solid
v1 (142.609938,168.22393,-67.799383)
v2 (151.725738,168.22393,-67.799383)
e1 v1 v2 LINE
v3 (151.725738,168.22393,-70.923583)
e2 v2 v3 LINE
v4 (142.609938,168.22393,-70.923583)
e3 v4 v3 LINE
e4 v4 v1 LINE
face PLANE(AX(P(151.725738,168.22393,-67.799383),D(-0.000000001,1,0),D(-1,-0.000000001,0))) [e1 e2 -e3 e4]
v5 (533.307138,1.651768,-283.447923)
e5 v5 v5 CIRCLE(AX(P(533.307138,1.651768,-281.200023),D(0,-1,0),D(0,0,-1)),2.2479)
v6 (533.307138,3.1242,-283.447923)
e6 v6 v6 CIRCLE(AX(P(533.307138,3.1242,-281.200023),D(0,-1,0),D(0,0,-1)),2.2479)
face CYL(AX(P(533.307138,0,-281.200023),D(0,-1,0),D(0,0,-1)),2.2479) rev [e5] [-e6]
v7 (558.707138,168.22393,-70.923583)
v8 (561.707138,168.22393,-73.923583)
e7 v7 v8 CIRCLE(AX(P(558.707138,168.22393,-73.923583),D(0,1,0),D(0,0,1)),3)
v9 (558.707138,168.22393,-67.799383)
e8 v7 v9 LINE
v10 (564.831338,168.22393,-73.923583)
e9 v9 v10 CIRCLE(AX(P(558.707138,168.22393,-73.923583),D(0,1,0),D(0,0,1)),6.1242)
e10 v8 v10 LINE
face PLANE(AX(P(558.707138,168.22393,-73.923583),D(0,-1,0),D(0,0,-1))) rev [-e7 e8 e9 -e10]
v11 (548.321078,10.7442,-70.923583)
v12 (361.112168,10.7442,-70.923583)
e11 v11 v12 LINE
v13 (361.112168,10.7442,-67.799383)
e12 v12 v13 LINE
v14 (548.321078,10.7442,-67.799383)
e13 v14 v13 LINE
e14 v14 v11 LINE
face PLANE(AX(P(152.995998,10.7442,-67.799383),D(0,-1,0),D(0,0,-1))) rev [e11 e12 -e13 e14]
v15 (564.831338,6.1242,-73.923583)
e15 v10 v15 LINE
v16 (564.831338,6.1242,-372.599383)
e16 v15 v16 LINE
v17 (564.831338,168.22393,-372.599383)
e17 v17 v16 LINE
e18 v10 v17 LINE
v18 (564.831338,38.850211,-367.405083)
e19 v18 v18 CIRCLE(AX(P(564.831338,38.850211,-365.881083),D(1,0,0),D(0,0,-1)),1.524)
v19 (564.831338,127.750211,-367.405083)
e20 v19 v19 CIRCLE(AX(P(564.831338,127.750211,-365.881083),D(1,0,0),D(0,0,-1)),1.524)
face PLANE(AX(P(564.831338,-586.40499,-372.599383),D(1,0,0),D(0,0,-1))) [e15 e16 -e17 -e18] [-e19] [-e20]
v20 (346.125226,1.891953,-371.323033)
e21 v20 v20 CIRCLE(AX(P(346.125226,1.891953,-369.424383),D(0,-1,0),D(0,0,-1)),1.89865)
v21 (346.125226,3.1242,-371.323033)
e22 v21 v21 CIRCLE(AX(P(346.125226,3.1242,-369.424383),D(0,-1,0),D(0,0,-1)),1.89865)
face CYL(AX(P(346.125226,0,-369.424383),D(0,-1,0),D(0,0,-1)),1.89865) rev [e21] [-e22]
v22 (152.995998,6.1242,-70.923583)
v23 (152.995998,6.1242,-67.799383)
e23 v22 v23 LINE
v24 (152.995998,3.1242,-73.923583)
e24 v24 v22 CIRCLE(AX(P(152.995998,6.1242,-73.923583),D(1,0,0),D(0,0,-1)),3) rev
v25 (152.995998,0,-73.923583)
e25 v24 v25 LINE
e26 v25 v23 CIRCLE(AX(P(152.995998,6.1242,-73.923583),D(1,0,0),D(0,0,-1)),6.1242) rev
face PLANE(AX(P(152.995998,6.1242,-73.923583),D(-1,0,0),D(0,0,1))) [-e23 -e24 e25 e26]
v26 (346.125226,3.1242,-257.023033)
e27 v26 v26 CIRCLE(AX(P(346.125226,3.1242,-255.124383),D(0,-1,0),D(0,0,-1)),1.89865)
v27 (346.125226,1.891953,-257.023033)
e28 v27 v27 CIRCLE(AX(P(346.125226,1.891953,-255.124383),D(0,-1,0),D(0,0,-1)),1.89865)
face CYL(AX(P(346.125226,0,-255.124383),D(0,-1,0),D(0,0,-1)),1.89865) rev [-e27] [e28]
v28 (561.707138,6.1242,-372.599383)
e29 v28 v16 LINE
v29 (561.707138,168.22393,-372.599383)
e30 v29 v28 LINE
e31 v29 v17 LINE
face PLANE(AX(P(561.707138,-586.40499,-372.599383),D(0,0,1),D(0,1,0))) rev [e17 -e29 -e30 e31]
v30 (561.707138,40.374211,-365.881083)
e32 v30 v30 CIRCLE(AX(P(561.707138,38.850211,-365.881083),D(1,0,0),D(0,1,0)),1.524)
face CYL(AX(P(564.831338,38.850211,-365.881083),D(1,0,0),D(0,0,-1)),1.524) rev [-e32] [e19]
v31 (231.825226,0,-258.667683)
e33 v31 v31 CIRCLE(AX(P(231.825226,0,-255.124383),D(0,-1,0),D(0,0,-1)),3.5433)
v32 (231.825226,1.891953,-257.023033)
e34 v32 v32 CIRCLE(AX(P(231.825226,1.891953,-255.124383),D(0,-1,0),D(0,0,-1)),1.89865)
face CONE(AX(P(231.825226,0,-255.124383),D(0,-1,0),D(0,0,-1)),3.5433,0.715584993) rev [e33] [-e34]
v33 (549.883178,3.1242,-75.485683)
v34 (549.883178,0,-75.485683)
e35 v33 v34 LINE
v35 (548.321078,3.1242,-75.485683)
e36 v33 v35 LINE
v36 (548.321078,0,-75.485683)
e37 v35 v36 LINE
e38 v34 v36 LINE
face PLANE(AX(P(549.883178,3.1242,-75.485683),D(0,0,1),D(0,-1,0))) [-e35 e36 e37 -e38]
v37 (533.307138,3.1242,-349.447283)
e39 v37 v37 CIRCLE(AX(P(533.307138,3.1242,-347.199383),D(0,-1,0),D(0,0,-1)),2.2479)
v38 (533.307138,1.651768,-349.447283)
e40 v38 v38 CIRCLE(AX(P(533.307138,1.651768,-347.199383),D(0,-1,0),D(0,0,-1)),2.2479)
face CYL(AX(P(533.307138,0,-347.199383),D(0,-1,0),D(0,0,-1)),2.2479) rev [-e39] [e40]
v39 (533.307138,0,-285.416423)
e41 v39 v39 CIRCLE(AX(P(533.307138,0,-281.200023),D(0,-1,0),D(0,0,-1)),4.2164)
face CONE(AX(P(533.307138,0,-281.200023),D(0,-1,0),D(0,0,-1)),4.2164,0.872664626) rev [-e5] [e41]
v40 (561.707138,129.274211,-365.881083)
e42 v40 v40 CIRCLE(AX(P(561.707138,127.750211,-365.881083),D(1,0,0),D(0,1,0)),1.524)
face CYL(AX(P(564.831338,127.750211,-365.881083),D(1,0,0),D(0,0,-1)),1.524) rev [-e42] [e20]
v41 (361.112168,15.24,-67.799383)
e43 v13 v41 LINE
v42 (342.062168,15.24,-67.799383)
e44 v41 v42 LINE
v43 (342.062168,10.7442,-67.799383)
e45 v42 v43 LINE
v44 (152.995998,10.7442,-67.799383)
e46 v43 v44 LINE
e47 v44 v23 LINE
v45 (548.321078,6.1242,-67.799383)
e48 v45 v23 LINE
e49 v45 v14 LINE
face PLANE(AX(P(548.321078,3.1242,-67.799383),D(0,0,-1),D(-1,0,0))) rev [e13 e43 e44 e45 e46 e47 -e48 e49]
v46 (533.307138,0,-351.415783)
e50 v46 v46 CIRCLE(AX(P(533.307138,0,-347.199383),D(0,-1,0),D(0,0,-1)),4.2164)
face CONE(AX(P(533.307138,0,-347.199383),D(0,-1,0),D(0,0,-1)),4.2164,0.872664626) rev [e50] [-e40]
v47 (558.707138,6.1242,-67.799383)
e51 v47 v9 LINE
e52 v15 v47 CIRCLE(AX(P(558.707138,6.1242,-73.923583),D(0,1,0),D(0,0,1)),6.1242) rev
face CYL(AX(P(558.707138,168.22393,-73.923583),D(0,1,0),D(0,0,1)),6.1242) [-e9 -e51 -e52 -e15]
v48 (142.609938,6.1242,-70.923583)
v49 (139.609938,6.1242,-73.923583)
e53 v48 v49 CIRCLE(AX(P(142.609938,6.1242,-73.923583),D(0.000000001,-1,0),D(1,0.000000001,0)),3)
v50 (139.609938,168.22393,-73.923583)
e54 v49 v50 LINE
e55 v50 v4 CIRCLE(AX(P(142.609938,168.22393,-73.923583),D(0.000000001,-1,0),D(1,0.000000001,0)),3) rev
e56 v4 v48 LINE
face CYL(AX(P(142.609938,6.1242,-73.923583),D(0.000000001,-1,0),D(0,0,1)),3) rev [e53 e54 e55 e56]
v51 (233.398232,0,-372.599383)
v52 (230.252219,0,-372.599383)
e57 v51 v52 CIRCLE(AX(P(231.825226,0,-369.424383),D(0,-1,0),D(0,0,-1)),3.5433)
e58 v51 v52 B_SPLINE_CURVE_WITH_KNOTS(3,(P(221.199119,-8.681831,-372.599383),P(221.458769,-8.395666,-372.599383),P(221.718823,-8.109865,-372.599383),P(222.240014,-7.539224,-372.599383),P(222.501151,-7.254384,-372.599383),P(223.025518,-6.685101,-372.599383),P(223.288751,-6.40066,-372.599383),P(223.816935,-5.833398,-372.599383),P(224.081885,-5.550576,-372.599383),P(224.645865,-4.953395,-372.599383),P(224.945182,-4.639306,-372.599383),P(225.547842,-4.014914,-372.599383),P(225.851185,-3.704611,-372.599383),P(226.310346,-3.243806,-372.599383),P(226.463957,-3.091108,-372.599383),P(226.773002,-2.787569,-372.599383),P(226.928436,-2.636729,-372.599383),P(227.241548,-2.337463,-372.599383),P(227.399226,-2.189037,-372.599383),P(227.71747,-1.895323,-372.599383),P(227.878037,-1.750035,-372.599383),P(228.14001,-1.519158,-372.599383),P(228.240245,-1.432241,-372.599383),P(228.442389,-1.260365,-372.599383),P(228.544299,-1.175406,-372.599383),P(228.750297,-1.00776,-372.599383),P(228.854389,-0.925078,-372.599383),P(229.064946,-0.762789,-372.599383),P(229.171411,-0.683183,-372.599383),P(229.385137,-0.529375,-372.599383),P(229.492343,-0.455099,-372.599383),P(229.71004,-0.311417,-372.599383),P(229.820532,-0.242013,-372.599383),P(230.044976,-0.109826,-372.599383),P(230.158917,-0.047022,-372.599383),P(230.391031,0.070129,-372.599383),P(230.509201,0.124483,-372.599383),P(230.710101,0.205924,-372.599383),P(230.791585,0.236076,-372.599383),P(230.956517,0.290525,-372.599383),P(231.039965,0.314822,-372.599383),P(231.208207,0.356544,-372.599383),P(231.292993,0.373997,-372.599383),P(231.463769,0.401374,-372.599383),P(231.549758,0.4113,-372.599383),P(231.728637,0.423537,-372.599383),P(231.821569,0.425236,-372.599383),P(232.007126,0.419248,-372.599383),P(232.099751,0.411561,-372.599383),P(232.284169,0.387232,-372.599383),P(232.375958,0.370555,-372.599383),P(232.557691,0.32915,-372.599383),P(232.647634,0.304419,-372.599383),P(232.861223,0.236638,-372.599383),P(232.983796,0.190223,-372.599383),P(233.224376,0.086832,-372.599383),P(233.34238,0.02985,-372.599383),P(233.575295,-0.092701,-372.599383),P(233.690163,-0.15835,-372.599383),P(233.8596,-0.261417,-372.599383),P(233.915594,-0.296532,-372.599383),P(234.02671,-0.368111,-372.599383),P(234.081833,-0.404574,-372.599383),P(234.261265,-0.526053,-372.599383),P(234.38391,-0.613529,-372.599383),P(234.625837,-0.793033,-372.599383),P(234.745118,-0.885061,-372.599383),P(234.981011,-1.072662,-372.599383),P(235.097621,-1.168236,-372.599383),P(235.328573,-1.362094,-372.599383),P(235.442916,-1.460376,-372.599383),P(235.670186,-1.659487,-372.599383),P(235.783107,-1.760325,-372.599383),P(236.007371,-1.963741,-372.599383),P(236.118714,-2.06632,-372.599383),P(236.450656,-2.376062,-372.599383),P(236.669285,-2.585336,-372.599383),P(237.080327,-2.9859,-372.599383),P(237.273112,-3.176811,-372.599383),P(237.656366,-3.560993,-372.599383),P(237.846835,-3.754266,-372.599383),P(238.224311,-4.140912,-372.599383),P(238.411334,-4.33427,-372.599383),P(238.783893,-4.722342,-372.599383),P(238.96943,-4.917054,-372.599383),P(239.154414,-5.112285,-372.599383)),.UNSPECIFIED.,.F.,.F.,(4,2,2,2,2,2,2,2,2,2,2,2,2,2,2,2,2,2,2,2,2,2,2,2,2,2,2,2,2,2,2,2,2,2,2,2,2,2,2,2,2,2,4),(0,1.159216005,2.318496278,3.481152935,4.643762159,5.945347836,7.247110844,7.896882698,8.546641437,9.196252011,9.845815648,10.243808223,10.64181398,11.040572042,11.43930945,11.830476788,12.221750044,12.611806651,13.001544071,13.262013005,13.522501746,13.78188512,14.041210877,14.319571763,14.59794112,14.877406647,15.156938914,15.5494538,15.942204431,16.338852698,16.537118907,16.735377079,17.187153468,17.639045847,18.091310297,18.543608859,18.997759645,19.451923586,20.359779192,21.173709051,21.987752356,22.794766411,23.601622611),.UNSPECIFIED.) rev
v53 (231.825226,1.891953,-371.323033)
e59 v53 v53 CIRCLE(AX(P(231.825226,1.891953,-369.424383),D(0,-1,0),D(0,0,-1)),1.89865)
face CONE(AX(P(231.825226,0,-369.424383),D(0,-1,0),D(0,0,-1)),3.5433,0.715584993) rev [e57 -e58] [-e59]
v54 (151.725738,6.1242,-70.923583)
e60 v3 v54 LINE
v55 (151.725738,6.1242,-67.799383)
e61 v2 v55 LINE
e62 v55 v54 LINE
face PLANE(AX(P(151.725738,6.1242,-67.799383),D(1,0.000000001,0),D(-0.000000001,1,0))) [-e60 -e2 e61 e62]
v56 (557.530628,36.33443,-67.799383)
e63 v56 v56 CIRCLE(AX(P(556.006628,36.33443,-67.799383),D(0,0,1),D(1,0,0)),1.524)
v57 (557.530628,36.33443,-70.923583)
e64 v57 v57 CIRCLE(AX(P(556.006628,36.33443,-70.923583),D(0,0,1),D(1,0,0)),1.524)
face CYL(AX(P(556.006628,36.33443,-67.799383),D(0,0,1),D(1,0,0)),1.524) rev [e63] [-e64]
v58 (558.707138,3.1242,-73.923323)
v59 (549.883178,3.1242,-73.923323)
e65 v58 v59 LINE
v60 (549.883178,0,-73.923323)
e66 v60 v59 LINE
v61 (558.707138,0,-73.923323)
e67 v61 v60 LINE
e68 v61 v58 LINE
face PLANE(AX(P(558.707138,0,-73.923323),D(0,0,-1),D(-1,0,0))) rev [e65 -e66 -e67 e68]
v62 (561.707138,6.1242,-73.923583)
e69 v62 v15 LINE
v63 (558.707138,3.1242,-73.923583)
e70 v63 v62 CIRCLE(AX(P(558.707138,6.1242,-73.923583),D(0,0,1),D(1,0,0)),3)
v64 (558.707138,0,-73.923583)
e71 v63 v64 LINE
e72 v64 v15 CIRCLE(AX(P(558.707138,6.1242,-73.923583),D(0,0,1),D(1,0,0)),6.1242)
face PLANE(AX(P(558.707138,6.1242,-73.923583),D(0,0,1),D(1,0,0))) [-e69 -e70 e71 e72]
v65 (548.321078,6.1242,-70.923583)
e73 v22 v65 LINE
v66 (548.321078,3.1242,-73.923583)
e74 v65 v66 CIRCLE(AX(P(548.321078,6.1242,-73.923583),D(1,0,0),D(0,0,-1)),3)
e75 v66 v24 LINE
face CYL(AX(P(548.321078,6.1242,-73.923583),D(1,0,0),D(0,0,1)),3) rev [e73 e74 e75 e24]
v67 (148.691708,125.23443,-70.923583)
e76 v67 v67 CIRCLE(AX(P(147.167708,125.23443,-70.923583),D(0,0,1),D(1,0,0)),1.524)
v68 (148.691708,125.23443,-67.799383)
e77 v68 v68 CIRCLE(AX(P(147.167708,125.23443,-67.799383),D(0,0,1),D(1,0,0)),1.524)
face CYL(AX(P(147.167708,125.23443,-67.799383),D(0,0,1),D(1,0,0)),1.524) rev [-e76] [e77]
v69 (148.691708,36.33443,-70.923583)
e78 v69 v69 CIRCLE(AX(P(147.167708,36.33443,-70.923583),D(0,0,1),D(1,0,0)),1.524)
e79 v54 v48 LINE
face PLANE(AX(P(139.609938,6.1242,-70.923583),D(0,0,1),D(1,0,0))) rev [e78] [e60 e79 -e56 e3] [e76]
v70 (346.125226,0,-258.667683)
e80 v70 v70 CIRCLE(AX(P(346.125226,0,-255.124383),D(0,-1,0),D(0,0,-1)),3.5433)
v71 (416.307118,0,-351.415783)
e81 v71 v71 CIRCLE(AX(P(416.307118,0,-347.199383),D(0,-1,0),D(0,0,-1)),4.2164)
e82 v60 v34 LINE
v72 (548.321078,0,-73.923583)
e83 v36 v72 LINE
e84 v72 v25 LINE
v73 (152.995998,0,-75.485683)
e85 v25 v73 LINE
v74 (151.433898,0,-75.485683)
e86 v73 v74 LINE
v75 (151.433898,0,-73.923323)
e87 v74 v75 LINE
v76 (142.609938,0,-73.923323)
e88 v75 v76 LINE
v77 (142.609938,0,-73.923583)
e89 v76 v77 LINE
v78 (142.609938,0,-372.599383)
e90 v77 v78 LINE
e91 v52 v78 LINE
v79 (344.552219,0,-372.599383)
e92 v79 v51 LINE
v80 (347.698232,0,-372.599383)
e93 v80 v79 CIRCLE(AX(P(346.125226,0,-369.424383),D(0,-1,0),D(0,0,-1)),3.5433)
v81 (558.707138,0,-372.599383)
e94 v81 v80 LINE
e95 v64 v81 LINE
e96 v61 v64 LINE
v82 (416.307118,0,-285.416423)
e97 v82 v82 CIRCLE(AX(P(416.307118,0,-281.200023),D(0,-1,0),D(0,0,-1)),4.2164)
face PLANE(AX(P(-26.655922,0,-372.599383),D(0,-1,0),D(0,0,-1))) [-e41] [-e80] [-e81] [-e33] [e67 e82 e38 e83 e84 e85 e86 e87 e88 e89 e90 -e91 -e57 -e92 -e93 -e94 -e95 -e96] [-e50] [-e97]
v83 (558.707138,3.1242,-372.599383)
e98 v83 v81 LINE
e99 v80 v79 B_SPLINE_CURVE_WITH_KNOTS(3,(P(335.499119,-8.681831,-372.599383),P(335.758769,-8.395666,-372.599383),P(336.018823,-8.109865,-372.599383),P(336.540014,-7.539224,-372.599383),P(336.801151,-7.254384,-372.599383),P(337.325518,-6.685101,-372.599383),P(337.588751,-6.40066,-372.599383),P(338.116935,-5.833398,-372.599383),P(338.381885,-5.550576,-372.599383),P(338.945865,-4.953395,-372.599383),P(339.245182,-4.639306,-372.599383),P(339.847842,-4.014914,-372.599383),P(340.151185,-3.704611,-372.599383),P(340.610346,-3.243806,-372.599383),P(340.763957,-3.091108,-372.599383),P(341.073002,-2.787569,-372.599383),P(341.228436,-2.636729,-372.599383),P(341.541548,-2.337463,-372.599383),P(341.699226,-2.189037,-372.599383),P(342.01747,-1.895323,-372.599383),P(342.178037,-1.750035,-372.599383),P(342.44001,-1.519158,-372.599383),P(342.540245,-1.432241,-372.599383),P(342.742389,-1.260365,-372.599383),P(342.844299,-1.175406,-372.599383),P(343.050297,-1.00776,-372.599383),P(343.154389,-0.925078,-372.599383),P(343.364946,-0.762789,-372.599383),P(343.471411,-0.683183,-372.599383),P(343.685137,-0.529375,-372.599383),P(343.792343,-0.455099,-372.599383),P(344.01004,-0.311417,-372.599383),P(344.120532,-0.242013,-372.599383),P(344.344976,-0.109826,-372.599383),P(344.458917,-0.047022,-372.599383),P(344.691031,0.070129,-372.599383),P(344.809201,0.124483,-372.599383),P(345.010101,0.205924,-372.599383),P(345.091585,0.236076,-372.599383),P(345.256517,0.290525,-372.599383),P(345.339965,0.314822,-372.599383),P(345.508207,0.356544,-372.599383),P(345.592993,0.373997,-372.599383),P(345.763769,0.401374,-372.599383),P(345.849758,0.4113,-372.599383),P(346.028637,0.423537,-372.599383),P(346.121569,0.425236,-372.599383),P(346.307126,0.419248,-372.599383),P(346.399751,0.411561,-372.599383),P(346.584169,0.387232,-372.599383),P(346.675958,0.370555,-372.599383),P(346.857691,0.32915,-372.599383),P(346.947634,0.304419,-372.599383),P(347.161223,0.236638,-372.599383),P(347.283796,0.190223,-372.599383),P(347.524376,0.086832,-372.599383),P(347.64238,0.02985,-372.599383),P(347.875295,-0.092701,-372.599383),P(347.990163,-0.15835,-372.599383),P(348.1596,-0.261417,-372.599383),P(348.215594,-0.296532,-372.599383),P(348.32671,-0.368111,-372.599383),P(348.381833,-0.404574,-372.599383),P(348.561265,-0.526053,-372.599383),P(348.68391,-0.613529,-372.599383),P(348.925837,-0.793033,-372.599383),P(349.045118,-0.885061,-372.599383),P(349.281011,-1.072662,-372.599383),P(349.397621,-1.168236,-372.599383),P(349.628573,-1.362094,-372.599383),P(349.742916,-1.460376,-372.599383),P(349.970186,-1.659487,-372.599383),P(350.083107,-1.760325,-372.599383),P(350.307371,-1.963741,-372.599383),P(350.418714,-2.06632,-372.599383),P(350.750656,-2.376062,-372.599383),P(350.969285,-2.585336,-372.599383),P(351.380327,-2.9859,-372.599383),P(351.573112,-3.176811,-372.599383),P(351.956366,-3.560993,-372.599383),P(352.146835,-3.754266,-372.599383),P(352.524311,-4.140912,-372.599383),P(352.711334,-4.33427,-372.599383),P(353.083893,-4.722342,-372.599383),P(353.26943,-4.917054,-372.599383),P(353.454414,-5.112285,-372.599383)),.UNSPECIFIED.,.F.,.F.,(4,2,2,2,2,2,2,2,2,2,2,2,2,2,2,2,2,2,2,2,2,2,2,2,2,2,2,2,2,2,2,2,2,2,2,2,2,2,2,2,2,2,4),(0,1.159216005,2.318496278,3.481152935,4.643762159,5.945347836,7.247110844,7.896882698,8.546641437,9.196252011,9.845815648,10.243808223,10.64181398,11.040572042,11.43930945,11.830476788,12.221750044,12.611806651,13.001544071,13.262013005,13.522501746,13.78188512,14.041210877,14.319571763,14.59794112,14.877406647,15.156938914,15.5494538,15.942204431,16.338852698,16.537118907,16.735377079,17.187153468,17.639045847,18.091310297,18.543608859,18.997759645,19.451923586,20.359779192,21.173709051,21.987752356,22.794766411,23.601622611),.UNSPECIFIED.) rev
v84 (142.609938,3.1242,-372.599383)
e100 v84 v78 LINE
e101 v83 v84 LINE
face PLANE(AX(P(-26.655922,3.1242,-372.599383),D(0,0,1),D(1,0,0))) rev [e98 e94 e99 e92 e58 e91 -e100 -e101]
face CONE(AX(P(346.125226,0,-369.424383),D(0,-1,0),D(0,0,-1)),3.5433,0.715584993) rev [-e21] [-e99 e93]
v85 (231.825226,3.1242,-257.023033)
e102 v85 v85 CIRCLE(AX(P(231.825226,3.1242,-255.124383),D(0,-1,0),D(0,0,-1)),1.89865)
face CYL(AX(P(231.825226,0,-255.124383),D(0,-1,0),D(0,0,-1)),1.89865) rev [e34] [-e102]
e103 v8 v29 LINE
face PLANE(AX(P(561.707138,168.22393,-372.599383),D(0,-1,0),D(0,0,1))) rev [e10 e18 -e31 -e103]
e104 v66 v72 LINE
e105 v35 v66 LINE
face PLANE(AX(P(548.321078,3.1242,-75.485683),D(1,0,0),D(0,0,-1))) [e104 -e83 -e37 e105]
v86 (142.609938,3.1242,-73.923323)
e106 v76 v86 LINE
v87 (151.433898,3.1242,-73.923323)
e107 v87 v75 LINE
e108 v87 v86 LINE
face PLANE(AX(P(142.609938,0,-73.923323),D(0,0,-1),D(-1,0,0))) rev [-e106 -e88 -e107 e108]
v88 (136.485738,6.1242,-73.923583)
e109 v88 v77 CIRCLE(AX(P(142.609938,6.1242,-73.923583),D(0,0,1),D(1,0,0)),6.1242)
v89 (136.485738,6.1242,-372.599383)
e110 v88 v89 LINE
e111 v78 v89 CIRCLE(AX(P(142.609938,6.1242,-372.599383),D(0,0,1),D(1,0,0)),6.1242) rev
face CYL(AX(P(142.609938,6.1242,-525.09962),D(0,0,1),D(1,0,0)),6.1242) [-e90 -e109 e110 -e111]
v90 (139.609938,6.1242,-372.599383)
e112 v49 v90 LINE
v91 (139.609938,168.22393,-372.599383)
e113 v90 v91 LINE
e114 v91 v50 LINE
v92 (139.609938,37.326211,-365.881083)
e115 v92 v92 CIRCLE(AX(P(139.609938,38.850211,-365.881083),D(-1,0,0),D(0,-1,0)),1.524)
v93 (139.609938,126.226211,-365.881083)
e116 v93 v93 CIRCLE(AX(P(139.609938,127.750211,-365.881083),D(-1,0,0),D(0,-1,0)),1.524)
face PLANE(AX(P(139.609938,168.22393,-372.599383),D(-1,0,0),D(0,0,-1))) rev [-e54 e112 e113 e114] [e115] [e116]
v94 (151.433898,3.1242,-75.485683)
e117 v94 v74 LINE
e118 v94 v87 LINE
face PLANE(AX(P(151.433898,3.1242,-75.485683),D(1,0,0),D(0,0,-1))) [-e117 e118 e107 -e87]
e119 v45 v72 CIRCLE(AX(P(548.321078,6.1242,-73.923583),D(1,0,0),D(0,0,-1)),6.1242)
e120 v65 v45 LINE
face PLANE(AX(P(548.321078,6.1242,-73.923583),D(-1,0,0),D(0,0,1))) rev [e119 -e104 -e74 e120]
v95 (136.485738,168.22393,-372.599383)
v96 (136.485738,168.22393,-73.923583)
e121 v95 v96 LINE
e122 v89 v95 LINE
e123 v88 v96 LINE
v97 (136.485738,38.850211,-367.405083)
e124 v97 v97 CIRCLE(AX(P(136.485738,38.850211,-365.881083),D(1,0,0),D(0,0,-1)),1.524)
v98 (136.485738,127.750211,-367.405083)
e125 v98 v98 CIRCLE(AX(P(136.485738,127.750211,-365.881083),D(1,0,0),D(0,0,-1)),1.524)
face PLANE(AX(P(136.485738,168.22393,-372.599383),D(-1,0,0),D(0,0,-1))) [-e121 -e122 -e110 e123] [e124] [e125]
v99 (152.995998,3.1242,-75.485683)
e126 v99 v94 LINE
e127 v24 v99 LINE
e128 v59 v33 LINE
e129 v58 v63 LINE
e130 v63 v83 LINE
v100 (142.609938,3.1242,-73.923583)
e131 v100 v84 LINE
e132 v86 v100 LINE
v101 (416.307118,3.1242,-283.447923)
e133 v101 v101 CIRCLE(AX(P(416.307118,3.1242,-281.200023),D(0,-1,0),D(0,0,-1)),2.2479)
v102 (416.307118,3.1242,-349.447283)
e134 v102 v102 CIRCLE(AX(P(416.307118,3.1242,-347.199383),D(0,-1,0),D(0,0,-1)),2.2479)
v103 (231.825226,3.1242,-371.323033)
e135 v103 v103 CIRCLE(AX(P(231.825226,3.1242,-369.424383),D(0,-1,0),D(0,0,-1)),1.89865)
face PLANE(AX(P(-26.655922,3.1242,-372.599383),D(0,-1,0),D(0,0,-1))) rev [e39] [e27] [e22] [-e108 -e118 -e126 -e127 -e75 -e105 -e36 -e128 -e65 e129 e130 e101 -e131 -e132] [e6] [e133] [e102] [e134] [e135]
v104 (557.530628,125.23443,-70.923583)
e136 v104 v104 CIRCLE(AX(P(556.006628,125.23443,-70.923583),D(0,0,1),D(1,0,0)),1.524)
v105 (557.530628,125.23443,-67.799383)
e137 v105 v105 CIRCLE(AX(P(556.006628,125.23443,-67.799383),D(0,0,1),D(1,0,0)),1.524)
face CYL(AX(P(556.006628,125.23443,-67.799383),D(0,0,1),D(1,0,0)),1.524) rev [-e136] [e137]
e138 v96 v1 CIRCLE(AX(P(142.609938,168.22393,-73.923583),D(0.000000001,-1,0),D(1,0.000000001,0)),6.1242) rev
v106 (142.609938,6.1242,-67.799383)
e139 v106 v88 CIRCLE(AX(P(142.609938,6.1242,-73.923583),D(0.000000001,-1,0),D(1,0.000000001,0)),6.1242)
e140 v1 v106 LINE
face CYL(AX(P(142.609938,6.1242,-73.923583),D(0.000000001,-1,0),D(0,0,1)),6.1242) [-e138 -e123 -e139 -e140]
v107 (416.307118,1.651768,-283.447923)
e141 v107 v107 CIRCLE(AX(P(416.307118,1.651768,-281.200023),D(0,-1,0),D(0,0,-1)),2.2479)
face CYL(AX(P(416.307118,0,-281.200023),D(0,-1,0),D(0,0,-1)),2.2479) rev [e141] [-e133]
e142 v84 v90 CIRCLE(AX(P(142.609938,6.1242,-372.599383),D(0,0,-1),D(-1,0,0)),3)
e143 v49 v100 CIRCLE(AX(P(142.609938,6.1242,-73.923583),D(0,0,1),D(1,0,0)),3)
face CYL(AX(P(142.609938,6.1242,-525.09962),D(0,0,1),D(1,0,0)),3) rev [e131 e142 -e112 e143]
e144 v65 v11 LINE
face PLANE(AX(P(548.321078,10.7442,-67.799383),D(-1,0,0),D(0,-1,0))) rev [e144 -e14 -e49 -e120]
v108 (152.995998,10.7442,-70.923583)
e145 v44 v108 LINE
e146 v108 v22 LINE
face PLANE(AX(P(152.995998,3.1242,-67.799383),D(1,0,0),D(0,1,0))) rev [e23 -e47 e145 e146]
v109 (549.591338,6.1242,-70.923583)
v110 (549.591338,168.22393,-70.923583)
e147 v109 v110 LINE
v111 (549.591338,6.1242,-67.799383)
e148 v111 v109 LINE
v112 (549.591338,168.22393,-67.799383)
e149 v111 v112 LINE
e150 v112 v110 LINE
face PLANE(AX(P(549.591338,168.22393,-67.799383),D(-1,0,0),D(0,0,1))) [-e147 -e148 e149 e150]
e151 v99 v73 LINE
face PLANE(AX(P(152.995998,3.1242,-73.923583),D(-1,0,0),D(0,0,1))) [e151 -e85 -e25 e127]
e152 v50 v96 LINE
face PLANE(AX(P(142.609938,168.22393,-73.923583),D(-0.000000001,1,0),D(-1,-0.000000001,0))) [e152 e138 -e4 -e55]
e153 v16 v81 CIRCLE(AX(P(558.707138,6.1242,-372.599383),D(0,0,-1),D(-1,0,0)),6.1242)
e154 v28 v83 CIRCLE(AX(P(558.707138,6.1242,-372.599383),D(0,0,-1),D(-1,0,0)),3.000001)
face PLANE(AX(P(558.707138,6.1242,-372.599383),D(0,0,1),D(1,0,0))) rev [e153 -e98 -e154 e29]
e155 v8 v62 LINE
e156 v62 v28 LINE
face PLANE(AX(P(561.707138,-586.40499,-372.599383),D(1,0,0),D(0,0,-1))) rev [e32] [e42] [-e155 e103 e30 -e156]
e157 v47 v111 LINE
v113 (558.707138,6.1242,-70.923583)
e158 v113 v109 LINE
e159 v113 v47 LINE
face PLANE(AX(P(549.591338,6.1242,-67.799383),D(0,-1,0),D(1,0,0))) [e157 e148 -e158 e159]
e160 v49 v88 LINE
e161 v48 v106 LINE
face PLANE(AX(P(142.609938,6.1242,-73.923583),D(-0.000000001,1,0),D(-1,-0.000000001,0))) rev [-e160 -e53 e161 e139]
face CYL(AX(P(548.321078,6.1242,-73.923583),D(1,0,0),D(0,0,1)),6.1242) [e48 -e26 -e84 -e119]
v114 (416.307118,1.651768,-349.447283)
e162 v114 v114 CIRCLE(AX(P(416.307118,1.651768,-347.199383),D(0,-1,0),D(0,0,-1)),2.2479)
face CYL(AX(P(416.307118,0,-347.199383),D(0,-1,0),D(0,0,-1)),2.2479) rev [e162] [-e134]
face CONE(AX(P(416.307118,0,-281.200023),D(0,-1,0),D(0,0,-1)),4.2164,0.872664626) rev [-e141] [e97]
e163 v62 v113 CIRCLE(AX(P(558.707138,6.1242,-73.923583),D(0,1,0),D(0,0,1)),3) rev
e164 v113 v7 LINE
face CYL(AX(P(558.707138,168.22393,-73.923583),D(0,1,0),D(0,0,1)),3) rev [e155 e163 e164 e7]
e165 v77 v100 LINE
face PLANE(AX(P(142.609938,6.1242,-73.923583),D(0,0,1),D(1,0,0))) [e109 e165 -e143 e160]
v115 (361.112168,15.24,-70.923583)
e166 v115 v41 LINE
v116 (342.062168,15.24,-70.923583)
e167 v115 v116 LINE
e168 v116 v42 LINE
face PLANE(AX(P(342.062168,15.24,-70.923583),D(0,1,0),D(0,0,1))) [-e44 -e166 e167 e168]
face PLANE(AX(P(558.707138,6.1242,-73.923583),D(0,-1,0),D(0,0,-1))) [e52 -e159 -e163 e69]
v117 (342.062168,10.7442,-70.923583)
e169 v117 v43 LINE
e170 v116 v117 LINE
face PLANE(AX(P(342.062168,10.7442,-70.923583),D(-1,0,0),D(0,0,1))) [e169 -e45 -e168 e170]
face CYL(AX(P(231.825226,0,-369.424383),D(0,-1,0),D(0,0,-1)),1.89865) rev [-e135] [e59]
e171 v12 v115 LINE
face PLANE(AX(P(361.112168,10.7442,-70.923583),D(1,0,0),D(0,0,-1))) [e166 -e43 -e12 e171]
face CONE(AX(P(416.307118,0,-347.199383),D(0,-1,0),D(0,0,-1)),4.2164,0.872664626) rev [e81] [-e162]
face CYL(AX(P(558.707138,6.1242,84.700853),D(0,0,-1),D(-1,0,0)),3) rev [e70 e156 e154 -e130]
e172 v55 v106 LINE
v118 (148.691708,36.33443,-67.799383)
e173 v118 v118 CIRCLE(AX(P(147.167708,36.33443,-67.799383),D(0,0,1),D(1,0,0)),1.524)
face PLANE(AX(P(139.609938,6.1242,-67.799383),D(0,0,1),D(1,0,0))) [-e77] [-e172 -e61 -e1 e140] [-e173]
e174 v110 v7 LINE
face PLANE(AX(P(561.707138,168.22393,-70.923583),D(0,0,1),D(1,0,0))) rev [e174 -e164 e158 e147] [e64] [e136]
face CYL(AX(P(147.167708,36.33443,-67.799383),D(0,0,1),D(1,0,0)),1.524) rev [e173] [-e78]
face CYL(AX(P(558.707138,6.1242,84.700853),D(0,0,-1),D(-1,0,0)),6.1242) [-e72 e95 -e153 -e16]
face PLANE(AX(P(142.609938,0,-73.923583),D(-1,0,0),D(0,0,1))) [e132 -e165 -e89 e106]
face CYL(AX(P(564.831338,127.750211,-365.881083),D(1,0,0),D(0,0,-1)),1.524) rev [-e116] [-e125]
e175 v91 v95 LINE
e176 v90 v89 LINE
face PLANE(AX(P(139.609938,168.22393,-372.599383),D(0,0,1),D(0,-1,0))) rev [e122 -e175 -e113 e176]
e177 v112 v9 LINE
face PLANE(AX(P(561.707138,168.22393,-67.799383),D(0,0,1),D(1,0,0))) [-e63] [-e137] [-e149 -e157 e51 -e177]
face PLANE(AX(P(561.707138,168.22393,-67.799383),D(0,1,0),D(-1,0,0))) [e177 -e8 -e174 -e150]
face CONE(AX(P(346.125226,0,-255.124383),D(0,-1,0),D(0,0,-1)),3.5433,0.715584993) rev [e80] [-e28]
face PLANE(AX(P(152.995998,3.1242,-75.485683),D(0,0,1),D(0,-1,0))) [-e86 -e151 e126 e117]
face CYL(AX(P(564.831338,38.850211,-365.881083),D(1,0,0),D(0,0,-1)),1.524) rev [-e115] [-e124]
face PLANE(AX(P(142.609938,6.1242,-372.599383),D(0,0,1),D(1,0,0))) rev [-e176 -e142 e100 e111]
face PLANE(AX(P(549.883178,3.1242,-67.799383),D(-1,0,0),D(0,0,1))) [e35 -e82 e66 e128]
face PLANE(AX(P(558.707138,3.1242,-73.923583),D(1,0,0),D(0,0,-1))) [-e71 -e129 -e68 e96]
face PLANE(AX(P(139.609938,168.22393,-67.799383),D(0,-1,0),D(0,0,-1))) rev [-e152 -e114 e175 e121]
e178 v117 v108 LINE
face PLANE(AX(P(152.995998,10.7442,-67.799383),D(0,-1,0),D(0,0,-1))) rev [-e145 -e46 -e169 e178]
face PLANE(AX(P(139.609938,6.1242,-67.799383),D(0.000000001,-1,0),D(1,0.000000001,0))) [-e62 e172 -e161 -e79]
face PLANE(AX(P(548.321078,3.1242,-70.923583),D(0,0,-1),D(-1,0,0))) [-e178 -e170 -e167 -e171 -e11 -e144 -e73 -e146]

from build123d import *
from OCP.BRepAlgoAPI import BRepAlgoAPI_Cut
from OCP.TopTools import TopTools_ListOfShape

# Parameters (mm, degrees)
BASE_FLANGE1_DEPTH                                = 3.1241999999999996
SKETCHED_START                                    = -372.599383401
SKETCHED_BEND1_DEPTH                              = 304.8
SKETCHED_BEND1_2_DEPTH                            = 304.8
SKETCHED_BEND2_DEPTH                              = 304.8
SKETCHED_BEND2_2_DEPTH                            = 304.8
EDGE_FLANGE1_START                                = -1
EDGE_FLANGE1_DEPTH                                = 169.22392973
EDGE_FLANGE1_2_DEPTH                              = 7.124199914
EDGE_FLANGE1_START_2                              = 6.124199914
EDGE_FLANGE1_3_DEPTH                              = 162.099729816
EDGE_FLANGE2_START                                = -1
EDGE_FLANGE2_DEPTH                                = 169.223930078
EDGE_FLANGE2_2_DEPTH                              = 7.1242
EDGE_FLANGE2_START_2                              = 6.1242
EDGE_FLANGE2_3_DEPTH                              = 162.099730078
CUT_EXTRUDE1_DEPTH                                = 697.5074743358982
CUT_EXTRUDE2_DEPTH                                = 697.5074743358982
EDGE_FLANGE4_START                                = 152.995997641
EDGE_FLANGE4_DEPTH                                = 395.32508
EDGE_FLANGE4_START_2                              = 151.433897641
EDGE_FLANGE4_2_DEPTH                              = 1.5621
EDGE_FLANGE4_START_3                              = 548.321077641
EDGE_FLANGE4_3_DEPTH                              = 1.5621
EDGE_FLANGE4_4_DEPTH                              = 395.32508
SKETCH18_W                                        = 19.05000000000001
SKETCH18_H                                        = 4.495799999999319
TAB1_DEPTH                                        = 3.1241999999999996
CSK_FOR_8_FLAT_HEAD_MACHINE_SCREW_100_D           = 4.4958
CSK_FOR_8_FLAT_HEAD_MACHINE_SCREW_100_CSINK_D     = 8.4328
CSK_FOR_8_FLAT_HEAD_MACHINE_SCREW_100_CSINK_ANGLE = 100
LPATTERN1_COUNT                                   = 2
LPATTERN1_PITCH                                   = 65.99936
LPATTERN1_COUNT_DIR2                              = 2
LPATTERN1_PITCH_DIR2                              = 117.00001999999999
CSK_FOR_6_FLAT_HEAD_MACHINE_SCREW2_D              = 3.7973
CSK_FOR_6_FLAT_HEAD_MACHINE_SCREW2_CSINK_D        = 7.0866
CSK_FOR_6_FLAT_HEAD_MACHINE_SCREW2_CSINK_ANGLE    = 82
LPATTERN3_COUNT                                   = 2
LPATTERN3_PITCH                                   = 114.3
LPATTERN3_COUNT_DIR2                              = 2
LPATTERN3_PITCH_DIR2                              = 114.3
F_40_0_098_DIAMETER_HOLE1_D                       = 3.048
F_40_0_098_DIAMETER_HOLE1_DEPTH                   = 304.8
LPATTERN4_COUNT                                   = 2
LPATTERN4_PITCH                                   = 88.89999999999999
MIRROR2_COPY_1_D                                  = 3.048
MIRROR2_COPY_1_DEPTH                              = 304.8
MIRROR2_COPY_2_D                                  = 3.048
MIRROR2_COPY_2_DEPTH                              = 304.8
MIRROR2_COPY_3_D                                  = 3.048
MIRROR2_COPY_3_DEPTH                              = 304.8
MIRROR2_COPY_4_D                                  = 3.048
MIRROR2_COPY_4_DEPTH                              = 304.8
F_40_0_098_DIAMETER_HOLE2_D                       = 3.048
LPATTERN5_COUNT                                   = 2
LPATTERN5_PITCH                                   = 88.89999999999999


with BuildPart() as part:
    # Base-Flange1: sheet metal written as solids
    # Sketch1 → Base-Flange1 (new body)
    with BuildSketch(Plane(origin=(0, 0, 0), x_dir=(1, 0, 0), z_dir=(0, 1, 0))):
        Polygon((-26.655922359465325, 372.5993834011592), (727.9729976405347, 372.5993834011592), (727.9729976405347, 67.79938340115923), (-26.65592235946532, 67.79938340115915), align=None)
    extrude(amount=BASE_FLANGE1_DEPTH)

    # Sketched Bend1: read off the stored shape, not the designer's step
    # Sketched Bend1 outline → Sketched Bend1 (cut)
    with BuildSketch(Plane.XY.offset(SKETCHED_START)):
        with BuildLine():
            ThreePointArc((142.609937641, 1e-07), (139.516943564, 0.838444419), (137.270853036, 3.1242))
            Line((137.270853036, 3.1242), (-26.655922359, 3.1242))
            Line((-26.655922359, 3.1242), (-26.655922359, 0))
            Line((-26.655922359, 0), (142.609937641, 1e-07))
        make_face()
    extrude(amount=SKETCHED_BEND1_DEPTH, mode=Mode.SUBTRACT)

    # Sketched Bend1 2 outline → Sketched Bend1 2 (add)
    with BuildSketch(Plane.XY.offset(SKETCHED_START)):
        with BuildLine():
            Line((139.60993774, 6.1242), (139.609937641, 168.223930078))
            Line((139.609937641, 168.223930078), (136.485737641, 168.223930078))
            Line((136.485737641, 168.223930078), (136.48573774, 6.1242))
            ThreePointArc((136.48573774, 6.1242), (136.68526694, 4.573683471), (137.270853036, 3.1242))
            Line((137.270853036, 3.1242), (142.609937641, 3.1242001))
            ThreePointArc((142.609937641, 3.1242001), (140.488617368, 4.002879727), (139.60993774, 6.1242))
        make_face()
    extrude(amount=SKETCHED_BEND1_2_DEPTH)

    # Sketched Bend2: read off the stored shape, not the designer's step
    # Sketched Bend2 outline → Sketched Bend2 (cut)
    with BuildSketch(Plane.XY.offset(SKETCHED_START)):
        with BuildLine():
            Line((727.972997641, 3.1242), (564.046222808, 3.1242))
            ThreePointArc((564.046222808, 3.1242), (561.800132084, 0.838444066), (558.707137641, -3.91e-07))
            Line((558.707137641, -3.91e-07), (727.972997641, 0))
            Line((727.972997641, 0), (727.972997641, 3.1242))
        make_face()
    extrude(amount=SKETCHED_BEND2_DEPTH, mode=Mode.SUBTRACT)

    # Sketched Bend2 2 outline → Sketched Bend2 2 (add)
    with BuildSketch(Plane.XY.offset(SKETCHED_START)):
        with BuildLine():
            Line((564.831337641, 168.223930078), (561.707137641, 168.223930078))
            Line((561.707137641, 168.223930078), (561.707138032, 6.1242))
            ThreePointArc((561.707138032, 6.1242), (560.828458261, 4.00287938), (558.707137641, 3.124199609))
            Line((558.707137641, 3.124199609), (564.046222808, 3.1242))
            ThreePointArc((564.046222808, 3.1242), (564.631808851, 4.57368348), (564.831338032, 6.1242))
            Line((564.831338032, 6.1242), (564.831337641, 168.223930078))
        make_face()
    extrude(amount=SKETCHED_BEND2_2_DEPTH)

    # Edge-Flange1: read off the stored shape, not the designer's step
    # Edge-Flange1 outline → Edge-Flange1 (cut)
    with BuildSketch(Plane(origin=(0, 0, 0), x_dir=(1.0, 6.15831459901035e-10, 0), z_dir=(-6.15831459901035e-10, 1.0, 0)).offset(EDGE_FLANGE1_START)):
        with BuildLine():
            Line((142.609937744, 70.923583401), (142.609937641, 73.923583401))
            Line((142.609937641, 73.923583401), (139.609937744, 73.923583401))
            ThreePointArc((139.609937744, 73.923583401), (140.488617401, 71.802263058), (142.609937744, 70.923583401))
        make_face()
        with BuildLine():
            ThreePointArc((142.609937682, 67.799383401), (138.279474373, 69.593120074), (136.485737744, 73.923583401))
            Line((136.485737744, 73.923583401), (136.485737735, 67.799383401))
            Line((136.485737735, 67.799383401), (142.609937682, 67.799383401))
        make_face()
    extrude(amount=EDGE_FLANGE1_DEPTH, mode=Mode.SUBTRACT)

    # Edge-Flange1 2 outline → Edge-Flange1 2 (cut)
    with BuildSketch(Plane(origin=(0, 0, 0), x_dir=(1.0, 6.15831459901035e-10, 0), z_dir=(-6.15831459901035e-10, 1.0, 0)).offset(EDGE_FLANGE1_START)):
        with BuildLine():
            Line((142.609937682, 67.799383401), (142.609937744, 70.923583401))
            ThreePointArc((142.609937744, 70.923583401), (140.488617401, 71.802263058), (139.609937744, 73.923583401))
            Line((139.609937744, 73.923583401), (136.485737744, 73.923583401))
            ThreePointArc((136.485737744, 73.923583401), (138.279474373, 69.593120074), (142.609937682, 67.799383401))
        make_face()
    extrude(amount=EDGE_FLANGE1_2_DEPTH, mode=Mode.SUBTRACT)

    # Edge-Flange1 3 outline → Edge-Flange1 3 (add)
    with BuildSketch(Plane(origin=(0, 0, 0), x_dir=(1.0, 6.15831459901035e-10, 0), z_dir=(-6.15831459901035e-10, 1.0, 0)).offset(EDGE_FLANGE1_START_2)):
        with BuildLine():
            Line((151.725737744, 70.923583401), (142.609937744, 70.923583401))
            ThreePointArc((142.609937744, 70.923583401), (140.488617401, 71.802263058), (139.609937744, 73.923583401))
            Line((139.609937744, 73.923583401), (139.609937735, 68.584498687))
            ThreePointArc((139.609937735, 68.584498687), (141.059421212, 67.998912598), (142.609937744, 67.799383401))
            Line((142.609937744, 67.799383401), (151.725737744, 67.799383401))
            Line((151.725737744, 67.799383401), (151.725737744, 70.923583401))
        make_face()
    extrude(amount=EDGE_FLANGE1_3_DEPTH)


with BuildPart() as edge_flange2_tool:
    # Edge-Flange2: read off the stored shape, not the designer's step
    # Edge-Flange2 outline → Edge-Flange2 (new body)
    with BuildSketch(Plane(origin=(0, 0, 0), x_dir=(1, 0, 0), z_dir=(0, 1, 0)).offset(EDGE_FLANGE2_START)):
        with BuildLine():
            Line((558.707137641, 67.799383401), (564.831337641, 67.799383401))
            Line((564.831337641, 67.799383401), (564.831337641, 73.923583401))
            ThreePointArc((564.831337641, 73.923583401), (563.03760099, 69.593120052), (558.707137641, 67.799383401))
        make_face()
        with BuildLine():
            Line((558.707137641, 73.923583401), (558.707137641, 70.923583401))
            ThreePointArc((558.707137641, 70.923583401), (560.828457984, 71.802263058), (561.707137641, 73.923583401))
            Line((561.707137641, 73.923583401), (558.707137641, 73.923583401))
        make_face()
    extrude(amount=EDGE_FLANGE2_DEPTH)


with BuildPart() as part_1:
    add(part.part)

    # Edge-Flange2: cut by edge_flange2_tool, with a tolerance
    edge_flange2_stock = TopTools_ListOfShape()
    edge_flange2_stock.Append(part_1.part.wrapped)
    edge_flange2_tools = TopTools_ListOfShape()
    edge_flange2_tools.Append(edge_flange2_tool.part.wrapped)
    edge_flange2_cut = BRepAlgoAPI_Cut()
    edge_flange2_cut.SetArguments(edge_flange2_stock)
    edge_flange2_cut.SetTools(edge_flange2_tools)
    edge_flange2_cut.SetFuzzyValue(0.00001)
    edge_flange2_cut.Build()
    add(Compound.cast(edge_flange2_cut.Shape()).solids(), mode=Mode.REPLACE)


with BuildPart() as edge_flange2_2_tool:
    # Edge-Flange2 2 outline → Edge-Flange2 2 (new body)
    with BuildSketch(Plane(origin=(0, 0, 0), x_dir=(1, 0, 0), z_dir=(0, 1, 0)).offset(EDGE_FLANGE2_START)):
        with BuildLine():
            Line((558.707137641, 70.923583401), (558.707137641, 67.799383401))
            ThreePointArc((558.707137641, 67.799383401), (563.03760099, 69.593120052), (564.831337641, 73.923583401))
            Line((564.831337641, 73.923583401), (561.707137641, 73.923583401))
            ThreePointArc((561.707137641, 73.923583401), (560.828457984, 71.802263058), (558.707137641, 70.923583401))
        make_face()
    extrude(amount=EDGE_FLANGE2_2_DEPTH)


with BuildPart() as part_2:
    add(part_1.part)

    # Edge-Flange2 2: cut by edge_flange2_2_tool, with a tolerance
    edge_flange2_2_stock = TopTools_ListOfShape()
    edge_flange2_2_stock.Append(part_2.part.wrapped)
    edge_flange2_2_tools = TopTools_ListOfShape()
    edge_flange2_2_tools.Append(edge_flange2_2_tool.part.wrapped)
    edge_flange2_2_cut = BRepAlgoAPI_Cut()
    edge_flange2_2_cut.SetArguments(edge_flange2_2_stock)
    edge_flange2_2_cut.SetTools(edge_flange2_2_tools)
    edge_flange2_2_cut.SetFuzzyValue(0.00001)
    edge_flange2_2_cut.Build()
    add(Compound.cast(edge_flange2_2_cut.Shape()).solids(), mode=Mode.REPLACE)


with BuildPart() as edge_flange2_3_tool:
    # Edge-Flange2 3 outline → Edge-Flange2 3 (new body)
    with BuildSketch(Plane(origin=(0, 0, 0), x_dir=(1, 0, 0), z_dir=(0, 1, 0)).offset(EDGE_FLANGE2_START_2)):
        with BuildLine():
            Line((549.591337641, 67.799383401), (558.707137641, 67.799383401))
            ThreePointArc((558.707137641, 67.799383401), (560.257654168, 67.998912597), (561.707137641, 68.584498682))
            Line((561.707137641, 68.584498682), (561.707137641, 73.923583401))
            ThreePointArc((561.707137641, 73.923583401), (560.828457984, 71.802263058), (558.707137641, 70.923583401))
            Line((558.707137641, 70.923583401), (549.591337641, 70.923583401))
            Line((549.591337641, 70.923583401), (549.591337641, 67.799383401))
        make_face()
    extrude(amount=EDGE_FLANGE2_3_DEPTH)


with BuildPart() as part_3:
    add(part_2.part)


with BuildPart() as part_4:
    # Edge-Flange2 3: joined with edge_flange2_3_tool
    add(part_3.part.fuse(edge_flange2_3_tool.part, tol=0.00001))

    # Sketch10 → Cut-Extrude1 (cut, through all)
    with BuildSketch(Plane(origin=(0, 3.1241999999999996, 0), x_dir=(-1, 0, 0), z_dir=(0, 1, 0))):
        Polygon((-142.60993764053464, -67.79938340115915), (-152.99599764053465, -67.79938340115915), (-152.99599764053463, -73.92332340115915), (-142.6099376405346, -73.92332340115917), align=None)
    extrude(amount=-CUT_EXTRUDE1_DEPTH, mode=Mode.SUBTRACT)

    # Sketch11 → Cut-Extrude2 (cut, through all)
    with BuildSketch(Plane(origin=(0, 3.1241999999999996, 0), x_dir=(-1, 0, 0), z_dir=(0, 1, 0))):
        Polygon((-558.7071376405341, -67.79938340115922), (-548.3210776405342, -67.7993834011592), (-548.3210776405341, -73.92332340115921), (-558.7071376405341, -73.92332340115921), align=None)
    extrude(amount=-CUT_EXTRUDE2_DEPTH, mode=Mode.SUBTRACT)

    # Edge-Flange4: read off the stored shape, not the designer's step
    # Edge-Flange4 outline → Edge-Flange4 (cut)
    with BuildSketch(Plane.YZ.offset(EDGE_FLANGE4_START)):
        with BuildLine():
            Line((-3.91e-07, -67.799383401), (6e-09, -73.923323401))
            ThreePointArc((6e-09, -73.923323401), (0.838510004, -70.830477048), (3.1242, -68.584498682))
            Line((3.1242, -68.584498682), (3.1242, -67.799383401))
            Line((3.1242, -67.799383401), (-3.91e-07, -67.799383401))
        make_face()
    extrude(amount=EDGE_FLANGE4_DEPTH, mode=Mode.SUBTRACT)

    # Edge-Flange4 2 outline → Edge-Flange4 2 (cut)
    with BuildSketch(Plane.YZ.offset(EDGE_FLANGE4_START_2)):
        Polygon((0, -75.485683401), (3.1242, -75.485683401), (3.1242, -73.923323401), (-3.91e-07, -73.923323401), align=None)
    extrude(amount=EDGE_FLANGE4_2_DEPTH, mode=Mode.SUBTRACT)

    # Edge-Flange4 3 outline → Edge-Flange4 3 (cut)
    with BuildSketch(Plane.YZ.offset(EDGE_FLANGE4_START_3)):
        Polygon((0, -75.485683401), (3.1242, -75.485683401), (3.1242, -73.923323401), (-3.91e-07, -73.923323401), align=None)
    extrude(amount=EDGE_FLANGE4_3_DEPTH, mode=Mode.SUBTRACT)

    # Edge-Flange4 4 outline → Edge-Flange4 4 (add)
    with BuildSketch(Plane.YZ.offset(EDGE_FLANGE4_START)):
        with BuildLine():
            Line((3.1242, -68.584498682), (3.124200011, -73.923323401))
            ThreePointArc((3.124200011, -73.923323401), (4.002971582, -71.802171136), (6.1242, -70.923583401))
            Line((6.1242, -70.923583401), (10.7442, -70.923583401))
            Line((10.7442, -70.923583401), (10.7442, -67.799383401))
            Line((10.7442, -67.799383401), (6.1242, -67.799383401))
            ThreePointArc((6.1242, -67.799383401), (4.573683473, -67.998912597), (3.1242, -68.584498682))
        make_face()
    extrude(amount=EDGE_FLANGE4_4_DEPTH)

    # Tab1: sheet metal written as solids
    # Sketch18 → Tab1 (add)
    with BuildSketch(Plane.XY.offset(-67.79938340115912)):
        with Locations((351.5871676405345, 12.99209999999966)):
            Rectangle(SKETCH18_W, SKETCH18_H)
    extrude(amount=-TAB1_DEPTH)

    # CSK for #8 Flat Head Machine Screw (100)1 (through all)
    with Locations(Plane(origin=(533.307137641, 0, -347.199383401), x_dir=(0, 0, -1), z_dir=(0, -1, 0))):
        with Locations((0, 0)):
            csk_for_8_flat_head_machine_screw_100 = CounterSinkHole(CSK_FOR_8_FLAT_HEAD_MACHINE_SCREW_100_D / 2, CSK_FOR_8_FLAT_HEAD_MACHINE_SCREW_100_CSINK_D / 2, counter_sink_angle=CSK_FOR_8_FLAT_HEAD_MACHINE_SCREW_100_CSINK_ANGLE)

    # LPattern1: CSK for _8 Flat Head Machine Screw _100 2 × 2
    with Locations(*[(-j * LPATTERN1_PITCH_DIR2, 0, i * LPATTERN1_PITCH) for i in range(LPATTERN1_COUNT) for j in range(LPATTERN1_COUNT_DIR2) if (i, j) != (0, 0)]):
        add(csk_for_8_flat_head_machine_screw_100, mode=Mode.SUBTRACT)

    # CSK for #6 Flat Head Machine Screw2 (through all)
    with Locations(Plane(origin=(346.125225558, 0, -369.424383401), x_dir=(0, 0, -1), z_dir=(0, -1, 0))):
        with Locations((0, 0)):
            csk_for_6_flat_head_machine_screw2 = CounterSinkHole(CSK_FOR_6_FLAT_HEAD_MACHINE_SCREW2_D / 2, CSK_FOR_6_FLAT_HEAD_MACHINE_SCREW2_CSINK_D / 2, counter_sink_angle=CSK_FOR_6_FLAT_HEAD_MACHINE_SCREW2_CSINK_ANGLE)

    # LPattern3: CSK for _6 Flat Head Machine Screw2 2 × 2
    with Locations(*[(-i * LPATTERN3_PITCH, 0, j * LPATTERN3_PITCH_DIR2) for i in range(LPATTERN3_COUNT) for j in range(LPATTERN3_COUNT_DIR2) if (i, j) != (0, 0)]):
        add(csk_for_6_flat_head_machine_screw2, mode=Mode.SUBTRACT)

    # #40 (0.098) Diameter Hole1
    with Locations(Plane.XY.offset(-67.79938340115964)):
        with Locations((147.167707641, 125.23443008)):
            f_40_0_098_diameter_hole1 = Hole(F_40_0_098_DIAMETER_HOLE1_D / 2, depth=F_40_0_098_DIAMETER_HOLE1_DEPTH)

    # LPattern4: #40 (0.098) Diameter Hole1 ×2
    with Locations(*[(0, -i * LPATTERN4_PITCH, 0) for i in range(1, LPATTERN4_COUNT)]):
        add(f_40_0_098_diameter_hole1, mode=Mode.SUBTRACT)

    # Mirror1: #40 (0.098) Diameter Hole1 across plane
    add(f_40_0_098_diameter_hole1.mirror(Plane(origin=(351.5871676405346, 15.239999999999316, -70.92358340115912), x_dir=(0, 0, 1), z_dir=(-1, 0, 0))), mode=Mode.SUBTRACT)

    # Mirror2 copy 1
    with Locations(Plane(origin=(703.1743352263219, -88.89999999999998, -67.79938340115964), x_dir=(-1, 0, 0), z_dir=(0, 0, 1))):
        with Locations((147.167707641, -125.23443008)):
            Hole(MIRROR2_COPY_1_D / 2, depth=MIRROR2_COPY_1_DEPTH)

    # Mirror2 copy 2
    with Locations(Plane(origin=(703.1743352810689, 1.161e-14, -67.79938340115964), x_dir=(-1, 0, 0), z_dir=(0, 0, 1))):
        with Locations((147.167707641, -125.23443008)):
            Hole(MIRROR2_COPY_2_D / 2, depth=MIRROR2_COPY_2_DEPTH)

    # Mirror2 copy 3
    with Locations(Plane.XY.offset(-67.79938340115964)):
        with Locations((147.167707641, 125.23443008)):
            Hole(MIRROR2_COPY_3_D / 2, depth=MIRROR2_COPY_3_DEPTH)

    # Mirror2 copy 4
    with Locations(Plane(origin=(703.1743352810689, 1.161e-14, -67.79938340115964), x_dir=(-1, 0, 0), z_dir=(0, 0, 1))):
        with Locations((147.167707641, -125.23443008)):
            Hole(MIRROR2_COPY_4_D / 2, depth=MIRROR2_COPY_4_DEPTH)

    # #40 (0.098) Diameter Hole2 (through all)
    with Locations(Plane(origin=(564.831337641, 38.850211002, -365.881083401), x_dir=(0, 1, 0), z_dir=(1, 0, 0))):
        with Locations((0, 0)):
            f_40_0_098_diameter_hole2 = Hole(F_40_0_098_DIAMETER_HOLE2_D / 2)

    # LPattern5: #40 (0.098) Diameter Hole2 ×2
    with Locations(*[(0, i * LPATTERN5_PITCH, 0) for i in range(1, LPATTERN5_COUNT)]):
        add(f_40_0_098_diameter_hole2, mode=Mode.SUBTRACT)


solid = part_4.part
